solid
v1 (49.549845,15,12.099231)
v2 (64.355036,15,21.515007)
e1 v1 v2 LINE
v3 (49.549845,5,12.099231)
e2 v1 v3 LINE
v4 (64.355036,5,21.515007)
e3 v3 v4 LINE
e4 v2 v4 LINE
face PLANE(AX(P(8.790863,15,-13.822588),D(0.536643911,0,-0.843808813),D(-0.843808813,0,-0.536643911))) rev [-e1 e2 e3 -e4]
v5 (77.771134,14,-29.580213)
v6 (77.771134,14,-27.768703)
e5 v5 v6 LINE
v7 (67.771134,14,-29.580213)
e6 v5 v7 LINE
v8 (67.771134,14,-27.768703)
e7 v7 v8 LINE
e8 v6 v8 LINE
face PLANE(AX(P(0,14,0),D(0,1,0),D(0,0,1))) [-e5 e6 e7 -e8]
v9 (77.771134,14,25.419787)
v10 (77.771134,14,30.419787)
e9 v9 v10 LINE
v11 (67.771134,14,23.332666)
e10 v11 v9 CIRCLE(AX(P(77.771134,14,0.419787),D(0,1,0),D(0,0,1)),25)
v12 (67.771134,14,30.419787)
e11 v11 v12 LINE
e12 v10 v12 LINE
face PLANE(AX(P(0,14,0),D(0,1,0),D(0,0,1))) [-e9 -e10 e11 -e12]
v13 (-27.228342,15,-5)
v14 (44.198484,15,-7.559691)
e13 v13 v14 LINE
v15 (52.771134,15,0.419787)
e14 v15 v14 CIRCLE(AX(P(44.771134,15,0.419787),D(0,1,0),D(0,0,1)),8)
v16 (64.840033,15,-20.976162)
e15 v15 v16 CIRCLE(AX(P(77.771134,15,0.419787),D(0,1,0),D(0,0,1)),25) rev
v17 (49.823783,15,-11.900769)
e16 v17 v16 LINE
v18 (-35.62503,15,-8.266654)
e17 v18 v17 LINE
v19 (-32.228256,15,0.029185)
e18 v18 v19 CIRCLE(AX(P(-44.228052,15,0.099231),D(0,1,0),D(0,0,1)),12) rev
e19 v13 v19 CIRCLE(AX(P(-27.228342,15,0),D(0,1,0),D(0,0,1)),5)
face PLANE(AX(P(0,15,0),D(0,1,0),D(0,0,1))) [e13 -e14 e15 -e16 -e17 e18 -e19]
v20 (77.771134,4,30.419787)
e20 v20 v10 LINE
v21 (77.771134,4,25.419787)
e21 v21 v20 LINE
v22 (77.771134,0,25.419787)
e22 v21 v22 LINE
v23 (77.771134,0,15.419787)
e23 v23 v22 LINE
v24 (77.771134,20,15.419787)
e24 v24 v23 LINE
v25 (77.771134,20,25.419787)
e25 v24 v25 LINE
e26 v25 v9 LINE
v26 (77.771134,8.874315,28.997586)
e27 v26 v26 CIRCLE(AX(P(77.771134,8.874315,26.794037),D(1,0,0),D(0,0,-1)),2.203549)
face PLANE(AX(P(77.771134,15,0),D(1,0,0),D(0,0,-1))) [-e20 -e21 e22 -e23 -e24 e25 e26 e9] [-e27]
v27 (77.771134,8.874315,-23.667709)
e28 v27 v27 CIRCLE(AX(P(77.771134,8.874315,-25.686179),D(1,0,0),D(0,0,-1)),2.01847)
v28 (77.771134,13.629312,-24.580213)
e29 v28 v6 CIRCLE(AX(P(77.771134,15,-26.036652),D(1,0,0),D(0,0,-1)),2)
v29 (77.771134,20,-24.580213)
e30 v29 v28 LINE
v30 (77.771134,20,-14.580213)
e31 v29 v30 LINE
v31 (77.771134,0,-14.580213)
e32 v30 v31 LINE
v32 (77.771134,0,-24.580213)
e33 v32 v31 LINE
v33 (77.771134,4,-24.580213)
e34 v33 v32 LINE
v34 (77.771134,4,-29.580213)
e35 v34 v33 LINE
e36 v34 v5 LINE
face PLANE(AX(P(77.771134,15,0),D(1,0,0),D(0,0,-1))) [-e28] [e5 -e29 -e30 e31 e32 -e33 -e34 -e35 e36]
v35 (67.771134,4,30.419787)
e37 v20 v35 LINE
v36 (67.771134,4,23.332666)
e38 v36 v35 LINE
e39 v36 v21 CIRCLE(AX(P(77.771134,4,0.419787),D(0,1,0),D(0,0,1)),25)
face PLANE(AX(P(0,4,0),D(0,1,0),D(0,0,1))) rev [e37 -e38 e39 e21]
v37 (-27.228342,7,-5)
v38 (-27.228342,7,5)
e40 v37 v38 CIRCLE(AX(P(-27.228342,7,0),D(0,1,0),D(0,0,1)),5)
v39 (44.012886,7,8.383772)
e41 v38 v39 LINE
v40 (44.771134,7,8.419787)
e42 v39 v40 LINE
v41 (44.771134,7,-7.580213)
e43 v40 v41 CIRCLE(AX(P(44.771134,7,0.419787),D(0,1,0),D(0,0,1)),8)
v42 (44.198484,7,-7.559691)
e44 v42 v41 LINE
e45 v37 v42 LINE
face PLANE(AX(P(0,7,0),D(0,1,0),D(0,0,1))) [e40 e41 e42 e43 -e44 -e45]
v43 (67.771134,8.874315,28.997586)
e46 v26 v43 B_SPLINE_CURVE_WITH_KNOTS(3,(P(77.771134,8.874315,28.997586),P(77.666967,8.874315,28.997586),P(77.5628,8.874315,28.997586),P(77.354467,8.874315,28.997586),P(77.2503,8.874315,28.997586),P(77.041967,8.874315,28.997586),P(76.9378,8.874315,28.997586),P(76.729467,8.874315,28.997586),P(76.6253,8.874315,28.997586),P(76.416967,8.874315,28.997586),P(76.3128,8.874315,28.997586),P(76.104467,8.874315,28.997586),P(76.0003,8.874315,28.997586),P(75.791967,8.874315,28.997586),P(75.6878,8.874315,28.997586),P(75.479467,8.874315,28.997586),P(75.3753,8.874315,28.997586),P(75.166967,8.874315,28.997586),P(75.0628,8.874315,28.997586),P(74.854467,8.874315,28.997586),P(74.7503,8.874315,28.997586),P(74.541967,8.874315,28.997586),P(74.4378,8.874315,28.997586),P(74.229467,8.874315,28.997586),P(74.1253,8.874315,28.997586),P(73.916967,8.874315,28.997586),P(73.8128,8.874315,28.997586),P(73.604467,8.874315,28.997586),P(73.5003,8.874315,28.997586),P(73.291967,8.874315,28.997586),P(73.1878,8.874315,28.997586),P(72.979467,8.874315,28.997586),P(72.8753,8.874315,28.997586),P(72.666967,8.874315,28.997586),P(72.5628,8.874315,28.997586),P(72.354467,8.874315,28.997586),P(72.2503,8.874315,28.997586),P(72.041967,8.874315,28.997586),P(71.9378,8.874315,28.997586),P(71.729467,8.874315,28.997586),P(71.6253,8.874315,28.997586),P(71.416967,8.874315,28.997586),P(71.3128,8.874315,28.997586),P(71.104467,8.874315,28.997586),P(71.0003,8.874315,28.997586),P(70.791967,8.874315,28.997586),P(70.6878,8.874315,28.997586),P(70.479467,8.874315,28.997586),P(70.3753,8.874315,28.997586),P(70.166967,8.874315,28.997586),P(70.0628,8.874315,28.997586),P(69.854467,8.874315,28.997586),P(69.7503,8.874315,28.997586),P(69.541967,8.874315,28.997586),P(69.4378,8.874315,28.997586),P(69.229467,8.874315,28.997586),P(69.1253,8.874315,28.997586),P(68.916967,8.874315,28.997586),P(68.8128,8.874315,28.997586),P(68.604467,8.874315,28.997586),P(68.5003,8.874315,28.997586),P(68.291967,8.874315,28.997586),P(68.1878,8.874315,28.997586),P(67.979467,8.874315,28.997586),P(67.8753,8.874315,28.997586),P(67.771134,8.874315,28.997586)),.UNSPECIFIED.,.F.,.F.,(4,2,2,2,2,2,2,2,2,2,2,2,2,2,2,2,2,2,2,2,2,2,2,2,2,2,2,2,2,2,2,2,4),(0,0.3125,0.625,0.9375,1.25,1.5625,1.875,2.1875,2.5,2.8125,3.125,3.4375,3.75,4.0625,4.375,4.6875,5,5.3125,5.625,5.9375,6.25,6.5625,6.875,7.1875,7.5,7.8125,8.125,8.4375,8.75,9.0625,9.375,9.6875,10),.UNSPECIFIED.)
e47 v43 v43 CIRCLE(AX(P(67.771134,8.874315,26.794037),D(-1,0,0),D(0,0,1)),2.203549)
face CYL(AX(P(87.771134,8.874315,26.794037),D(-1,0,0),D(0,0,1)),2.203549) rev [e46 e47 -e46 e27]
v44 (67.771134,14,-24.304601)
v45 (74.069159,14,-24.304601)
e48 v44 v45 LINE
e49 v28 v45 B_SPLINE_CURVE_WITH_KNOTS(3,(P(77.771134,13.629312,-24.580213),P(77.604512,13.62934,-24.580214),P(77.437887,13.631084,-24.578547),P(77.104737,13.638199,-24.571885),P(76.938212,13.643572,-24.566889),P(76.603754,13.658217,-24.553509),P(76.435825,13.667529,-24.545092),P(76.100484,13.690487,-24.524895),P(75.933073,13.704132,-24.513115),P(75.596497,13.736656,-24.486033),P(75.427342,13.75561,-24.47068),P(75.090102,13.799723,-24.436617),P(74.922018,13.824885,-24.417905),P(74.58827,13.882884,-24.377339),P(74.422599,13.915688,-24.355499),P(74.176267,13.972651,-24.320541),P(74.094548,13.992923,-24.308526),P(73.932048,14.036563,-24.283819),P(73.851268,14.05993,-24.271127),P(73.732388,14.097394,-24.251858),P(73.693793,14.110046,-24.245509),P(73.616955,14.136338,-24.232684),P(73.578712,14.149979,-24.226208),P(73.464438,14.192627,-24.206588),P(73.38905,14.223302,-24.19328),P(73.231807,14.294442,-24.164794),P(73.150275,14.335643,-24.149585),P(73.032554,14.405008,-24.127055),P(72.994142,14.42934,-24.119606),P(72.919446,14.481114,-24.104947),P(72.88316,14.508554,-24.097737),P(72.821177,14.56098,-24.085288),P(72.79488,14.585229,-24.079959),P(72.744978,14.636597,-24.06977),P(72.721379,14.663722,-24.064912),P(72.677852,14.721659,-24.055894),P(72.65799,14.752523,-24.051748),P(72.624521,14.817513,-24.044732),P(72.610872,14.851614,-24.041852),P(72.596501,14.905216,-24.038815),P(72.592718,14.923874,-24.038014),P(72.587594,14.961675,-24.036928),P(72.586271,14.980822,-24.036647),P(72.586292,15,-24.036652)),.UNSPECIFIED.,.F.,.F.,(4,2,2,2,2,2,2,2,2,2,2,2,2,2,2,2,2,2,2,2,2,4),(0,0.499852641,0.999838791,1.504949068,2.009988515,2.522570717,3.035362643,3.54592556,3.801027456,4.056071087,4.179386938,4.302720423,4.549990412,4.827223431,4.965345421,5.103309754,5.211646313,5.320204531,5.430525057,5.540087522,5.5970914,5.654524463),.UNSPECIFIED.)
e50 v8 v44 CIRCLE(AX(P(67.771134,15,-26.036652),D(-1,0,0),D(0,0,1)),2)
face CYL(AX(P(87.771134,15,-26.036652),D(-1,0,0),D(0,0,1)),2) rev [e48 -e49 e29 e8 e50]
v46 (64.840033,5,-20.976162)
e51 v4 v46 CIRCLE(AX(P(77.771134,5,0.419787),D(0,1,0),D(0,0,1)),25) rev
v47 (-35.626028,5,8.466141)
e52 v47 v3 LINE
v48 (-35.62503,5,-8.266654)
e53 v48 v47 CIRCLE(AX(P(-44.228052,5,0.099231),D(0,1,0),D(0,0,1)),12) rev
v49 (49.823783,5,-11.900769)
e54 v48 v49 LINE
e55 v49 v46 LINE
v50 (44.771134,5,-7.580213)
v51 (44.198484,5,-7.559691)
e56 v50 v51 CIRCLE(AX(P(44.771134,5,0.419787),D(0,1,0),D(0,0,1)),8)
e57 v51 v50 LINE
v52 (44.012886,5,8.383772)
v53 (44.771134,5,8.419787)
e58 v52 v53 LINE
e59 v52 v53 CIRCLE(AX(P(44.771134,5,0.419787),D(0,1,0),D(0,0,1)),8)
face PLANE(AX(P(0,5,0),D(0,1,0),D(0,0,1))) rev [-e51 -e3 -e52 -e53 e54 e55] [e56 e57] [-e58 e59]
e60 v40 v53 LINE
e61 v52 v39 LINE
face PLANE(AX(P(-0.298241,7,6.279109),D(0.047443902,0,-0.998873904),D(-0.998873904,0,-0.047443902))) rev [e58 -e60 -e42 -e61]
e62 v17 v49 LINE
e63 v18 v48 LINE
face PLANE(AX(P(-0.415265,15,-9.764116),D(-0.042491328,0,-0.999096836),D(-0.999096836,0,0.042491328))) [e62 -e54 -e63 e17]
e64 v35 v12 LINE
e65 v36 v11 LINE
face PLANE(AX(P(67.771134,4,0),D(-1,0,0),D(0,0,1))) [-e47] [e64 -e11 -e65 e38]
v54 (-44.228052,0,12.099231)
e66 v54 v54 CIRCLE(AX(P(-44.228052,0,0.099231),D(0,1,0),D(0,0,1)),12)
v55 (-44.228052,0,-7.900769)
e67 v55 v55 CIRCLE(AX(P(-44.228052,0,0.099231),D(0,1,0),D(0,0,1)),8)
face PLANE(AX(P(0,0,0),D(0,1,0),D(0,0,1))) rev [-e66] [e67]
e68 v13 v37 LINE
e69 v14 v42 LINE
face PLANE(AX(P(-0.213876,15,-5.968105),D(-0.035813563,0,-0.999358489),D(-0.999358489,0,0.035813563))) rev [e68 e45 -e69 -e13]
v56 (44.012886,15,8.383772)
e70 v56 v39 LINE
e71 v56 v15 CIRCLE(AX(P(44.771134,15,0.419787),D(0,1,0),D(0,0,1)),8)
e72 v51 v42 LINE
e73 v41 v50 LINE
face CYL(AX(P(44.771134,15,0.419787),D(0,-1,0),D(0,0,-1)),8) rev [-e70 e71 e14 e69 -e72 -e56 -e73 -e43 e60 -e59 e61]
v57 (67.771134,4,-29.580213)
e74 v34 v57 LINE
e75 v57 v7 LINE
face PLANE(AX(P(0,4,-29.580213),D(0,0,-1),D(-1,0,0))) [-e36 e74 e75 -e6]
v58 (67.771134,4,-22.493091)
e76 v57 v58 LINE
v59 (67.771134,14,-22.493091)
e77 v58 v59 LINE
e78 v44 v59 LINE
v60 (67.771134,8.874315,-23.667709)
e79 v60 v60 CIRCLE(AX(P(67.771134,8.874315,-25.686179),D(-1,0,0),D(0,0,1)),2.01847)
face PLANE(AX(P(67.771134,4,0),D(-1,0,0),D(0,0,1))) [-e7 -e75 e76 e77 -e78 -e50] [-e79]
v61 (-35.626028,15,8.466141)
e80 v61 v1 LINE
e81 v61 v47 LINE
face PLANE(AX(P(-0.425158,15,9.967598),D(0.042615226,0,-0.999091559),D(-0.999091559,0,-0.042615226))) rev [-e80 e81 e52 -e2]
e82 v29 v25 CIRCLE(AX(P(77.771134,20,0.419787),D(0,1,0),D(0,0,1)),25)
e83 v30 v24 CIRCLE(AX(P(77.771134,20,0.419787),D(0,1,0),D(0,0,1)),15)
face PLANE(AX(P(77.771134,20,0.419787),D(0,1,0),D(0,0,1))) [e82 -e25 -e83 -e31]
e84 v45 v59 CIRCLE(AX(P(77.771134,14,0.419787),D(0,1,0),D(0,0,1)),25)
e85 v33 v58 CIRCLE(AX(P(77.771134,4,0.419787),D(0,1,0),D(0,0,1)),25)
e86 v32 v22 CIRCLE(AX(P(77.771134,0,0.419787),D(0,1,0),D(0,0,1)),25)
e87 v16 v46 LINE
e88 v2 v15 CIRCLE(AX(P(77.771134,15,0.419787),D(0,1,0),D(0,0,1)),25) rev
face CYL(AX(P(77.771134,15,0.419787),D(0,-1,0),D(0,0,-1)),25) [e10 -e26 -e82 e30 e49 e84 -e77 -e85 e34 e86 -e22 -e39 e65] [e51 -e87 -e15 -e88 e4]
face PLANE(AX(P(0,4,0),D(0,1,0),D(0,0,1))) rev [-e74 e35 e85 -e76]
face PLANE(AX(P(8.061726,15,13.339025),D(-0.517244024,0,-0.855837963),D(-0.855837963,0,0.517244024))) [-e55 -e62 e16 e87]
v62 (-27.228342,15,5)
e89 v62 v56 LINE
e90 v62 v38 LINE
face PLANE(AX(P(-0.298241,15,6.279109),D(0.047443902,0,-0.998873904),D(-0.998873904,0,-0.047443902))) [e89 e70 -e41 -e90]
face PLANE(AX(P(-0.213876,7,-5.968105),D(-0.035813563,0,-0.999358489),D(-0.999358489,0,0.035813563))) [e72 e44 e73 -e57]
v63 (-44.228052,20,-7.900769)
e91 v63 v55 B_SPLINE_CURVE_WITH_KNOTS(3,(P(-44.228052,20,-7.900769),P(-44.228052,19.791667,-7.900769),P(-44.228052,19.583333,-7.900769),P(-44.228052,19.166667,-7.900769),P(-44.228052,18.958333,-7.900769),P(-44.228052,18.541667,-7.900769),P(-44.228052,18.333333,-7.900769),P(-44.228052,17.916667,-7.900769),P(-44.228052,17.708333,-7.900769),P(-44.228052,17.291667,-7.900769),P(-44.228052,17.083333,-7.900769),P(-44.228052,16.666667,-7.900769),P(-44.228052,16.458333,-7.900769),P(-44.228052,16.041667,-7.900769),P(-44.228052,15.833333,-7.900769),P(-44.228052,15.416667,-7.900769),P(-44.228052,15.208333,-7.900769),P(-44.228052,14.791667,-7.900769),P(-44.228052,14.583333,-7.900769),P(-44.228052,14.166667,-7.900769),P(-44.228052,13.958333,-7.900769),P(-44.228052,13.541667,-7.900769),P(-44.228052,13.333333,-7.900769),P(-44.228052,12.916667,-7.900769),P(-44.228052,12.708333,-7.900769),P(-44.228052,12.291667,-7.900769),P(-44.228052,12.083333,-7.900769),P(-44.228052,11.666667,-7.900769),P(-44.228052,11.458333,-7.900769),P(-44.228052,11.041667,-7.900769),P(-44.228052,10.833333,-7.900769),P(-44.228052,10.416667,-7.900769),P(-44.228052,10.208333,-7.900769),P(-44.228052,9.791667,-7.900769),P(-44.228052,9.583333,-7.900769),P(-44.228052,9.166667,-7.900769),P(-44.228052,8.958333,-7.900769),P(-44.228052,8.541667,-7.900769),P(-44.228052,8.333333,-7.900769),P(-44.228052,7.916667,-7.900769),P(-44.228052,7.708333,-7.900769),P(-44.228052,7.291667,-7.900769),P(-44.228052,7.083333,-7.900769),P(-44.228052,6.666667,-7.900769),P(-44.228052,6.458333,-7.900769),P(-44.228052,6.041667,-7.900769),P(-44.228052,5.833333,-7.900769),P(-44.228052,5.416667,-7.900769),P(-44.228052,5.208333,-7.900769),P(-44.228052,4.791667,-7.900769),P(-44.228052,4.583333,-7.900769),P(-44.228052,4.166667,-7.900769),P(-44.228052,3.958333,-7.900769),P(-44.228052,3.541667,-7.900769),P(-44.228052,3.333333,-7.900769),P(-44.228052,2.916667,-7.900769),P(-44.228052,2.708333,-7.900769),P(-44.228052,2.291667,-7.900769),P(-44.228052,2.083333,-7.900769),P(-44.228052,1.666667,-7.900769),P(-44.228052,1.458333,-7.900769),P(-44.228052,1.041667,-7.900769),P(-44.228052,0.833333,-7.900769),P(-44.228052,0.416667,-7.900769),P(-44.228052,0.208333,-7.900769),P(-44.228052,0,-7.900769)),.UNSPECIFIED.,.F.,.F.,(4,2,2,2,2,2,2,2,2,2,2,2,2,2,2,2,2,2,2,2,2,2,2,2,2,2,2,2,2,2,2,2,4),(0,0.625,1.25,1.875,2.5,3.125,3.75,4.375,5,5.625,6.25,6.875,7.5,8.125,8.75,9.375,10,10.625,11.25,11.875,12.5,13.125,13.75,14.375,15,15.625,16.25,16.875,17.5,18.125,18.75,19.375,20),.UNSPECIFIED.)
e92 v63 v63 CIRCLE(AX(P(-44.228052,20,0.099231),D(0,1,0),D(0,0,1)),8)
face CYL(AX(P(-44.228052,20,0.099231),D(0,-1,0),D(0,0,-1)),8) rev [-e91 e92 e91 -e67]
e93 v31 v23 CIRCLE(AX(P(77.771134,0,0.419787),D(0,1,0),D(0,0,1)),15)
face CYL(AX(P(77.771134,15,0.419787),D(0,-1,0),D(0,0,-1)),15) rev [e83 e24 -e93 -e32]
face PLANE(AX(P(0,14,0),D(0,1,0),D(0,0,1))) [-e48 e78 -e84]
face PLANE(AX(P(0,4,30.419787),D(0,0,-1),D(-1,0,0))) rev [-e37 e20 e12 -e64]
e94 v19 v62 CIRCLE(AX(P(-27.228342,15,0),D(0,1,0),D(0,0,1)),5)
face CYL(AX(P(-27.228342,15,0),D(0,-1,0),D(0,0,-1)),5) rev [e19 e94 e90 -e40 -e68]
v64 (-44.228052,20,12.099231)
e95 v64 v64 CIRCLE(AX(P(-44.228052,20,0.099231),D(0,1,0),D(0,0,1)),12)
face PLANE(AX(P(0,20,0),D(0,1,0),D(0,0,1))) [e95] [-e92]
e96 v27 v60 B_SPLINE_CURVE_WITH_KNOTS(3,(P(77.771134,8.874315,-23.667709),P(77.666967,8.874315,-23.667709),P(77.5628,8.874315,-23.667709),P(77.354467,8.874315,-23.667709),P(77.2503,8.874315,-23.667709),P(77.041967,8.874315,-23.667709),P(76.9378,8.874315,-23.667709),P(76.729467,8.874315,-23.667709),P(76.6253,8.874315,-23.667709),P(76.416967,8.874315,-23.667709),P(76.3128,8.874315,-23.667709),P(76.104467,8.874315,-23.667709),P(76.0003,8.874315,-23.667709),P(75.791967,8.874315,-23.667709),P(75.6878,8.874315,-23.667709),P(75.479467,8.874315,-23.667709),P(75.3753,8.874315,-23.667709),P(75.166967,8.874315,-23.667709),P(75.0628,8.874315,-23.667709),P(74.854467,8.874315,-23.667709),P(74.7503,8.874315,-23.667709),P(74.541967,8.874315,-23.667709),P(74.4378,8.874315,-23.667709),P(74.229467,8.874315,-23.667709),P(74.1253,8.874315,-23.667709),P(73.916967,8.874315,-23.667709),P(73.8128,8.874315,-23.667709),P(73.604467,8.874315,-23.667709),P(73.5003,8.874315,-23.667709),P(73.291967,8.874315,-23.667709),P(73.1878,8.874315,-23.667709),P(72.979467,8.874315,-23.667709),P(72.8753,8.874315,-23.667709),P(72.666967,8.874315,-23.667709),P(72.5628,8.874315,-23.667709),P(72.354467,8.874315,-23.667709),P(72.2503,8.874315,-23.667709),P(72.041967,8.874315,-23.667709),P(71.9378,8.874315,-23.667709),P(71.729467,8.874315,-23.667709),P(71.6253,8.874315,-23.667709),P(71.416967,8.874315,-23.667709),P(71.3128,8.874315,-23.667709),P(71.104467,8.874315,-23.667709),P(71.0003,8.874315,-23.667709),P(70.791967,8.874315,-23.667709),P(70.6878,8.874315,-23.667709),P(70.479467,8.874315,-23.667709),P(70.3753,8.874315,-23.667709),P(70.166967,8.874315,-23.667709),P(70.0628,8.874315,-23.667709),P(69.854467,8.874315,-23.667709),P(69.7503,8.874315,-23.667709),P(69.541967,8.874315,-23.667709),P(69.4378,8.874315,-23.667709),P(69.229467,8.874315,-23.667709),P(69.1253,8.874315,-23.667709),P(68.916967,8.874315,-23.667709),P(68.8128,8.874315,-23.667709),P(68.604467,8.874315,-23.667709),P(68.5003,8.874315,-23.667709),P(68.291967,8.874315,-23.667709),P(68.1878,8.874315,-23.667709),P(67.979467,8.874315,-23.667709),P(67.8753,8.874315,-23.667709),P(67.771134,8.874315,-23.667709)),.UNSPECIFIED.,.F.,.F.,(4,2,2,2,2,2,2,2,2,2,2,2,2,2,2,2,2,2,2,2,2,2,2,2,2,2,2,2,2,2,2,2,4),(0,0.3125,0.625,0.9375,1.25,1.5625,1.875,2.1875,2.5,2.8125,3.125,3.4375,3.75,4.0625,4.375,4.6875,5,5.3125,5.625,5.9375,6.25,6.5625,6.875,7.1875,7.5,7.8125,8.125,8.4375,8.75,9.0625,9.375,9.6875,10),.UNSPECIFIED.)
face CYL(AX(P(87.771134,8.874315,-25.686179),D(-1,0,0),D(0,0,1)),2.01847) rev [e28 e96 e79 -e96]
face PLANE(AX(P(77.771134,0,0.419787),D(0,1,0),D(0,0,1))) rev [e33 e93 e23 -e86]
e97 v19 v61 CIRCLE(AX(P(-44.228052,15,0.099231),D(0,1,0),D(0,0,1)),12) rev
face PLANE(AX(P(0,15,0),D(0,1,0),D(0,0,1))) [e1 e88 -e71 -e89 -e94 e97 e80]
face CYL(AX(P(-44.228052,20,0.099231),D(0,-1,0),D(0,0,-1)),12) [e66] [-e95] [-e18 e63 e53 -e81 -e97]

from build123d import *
from build123d.topology import SkipClean

# Parameters (mm, degrees)
EXTRUDE_START       = 5
EXTRUDE_2_DEPTH     = 10
EXTRUDE_4_DEPTH     = 2
EXTRUDE_START_2     = -11
EXTRUDE_5_DEPTH     = 10
EXTRUDE_6_DEPTH     = 20
SKETCH_1_10_R       = 12
EXTRUDE_7_DEPTH     = 10
SKETCH_1_11_R       = 12
EXTRUDE_8_DEPTH     = 20
SKETCH_1_12_R       = 8
CUT_EXTRUDE_1_DEPTH = 20
SKETCH_5_R          = 2
CUT_EXTRUDE_2_DEPTH = 20
EXTRUDE_9_DEPTH     = 20
SKETCH_6_R          = 2.01846984
SKETCH_6_R_2        = 2.203549483
CUT_EXTRUDE_3_DEPTH = 20


with BuildPart() as part:
    # 스케치1 → 보스-돌출2 (new body)
    with BuildSketch(Plane(origin=(0, 0, 0), x_dir=(1, 0, 0), z_dir=(0, 1, 0)).offset(EXTRUDE_START)):
        with BuildLine():
            Line((49.549845173, -12.099230676), (64.355035733, -21.515007377))
            ThreePointArc((64.355035733, -21.515007377), (70.784736297, -24.42375035), (77.771133503, -25.41978705))
            Line((77.771133503, -25.41978705), (77.771133503, -15.41978705))
            ThreePointArc((77.771133503, -15.41978705), (62.771133503, -0.41978705), (77.771133503, 14.58021295))
            Line((77.771133503, 14.58021295), (77.771133503, 24.58021295))
            ThreePointArc((77.771133503, 24.58021295), (71.05915641, 23.662350801), (64.840032894, 20.97616203))
            Line((64.840032894, 20.97616203), (49.823782841, 11.900769324))
            Line((49.823782841, 11.900769324), (-44.228051971, 7.900769324))
            ThreePointArc((-44.228051971, 7.900769324), (-36.228051971, -0.099230676), (-44.228051971, -8.099230676))
            Line((-44.228051971, -8.099230676), (49.549845173, -12.099230676))
        make_face()
        with BuildLine():
            ThreePointArc((44.198484097, 7.559691169), (52.770591505, -0.512908915), (44.012885893, -8.383772269))
            Line((44.012885893, -8.383772269), (-27.228341583, -5))
            ThreePointArc((-27.228341583, -5), (-32.228341583, 0), (-27.228341583, 5))
            Line((-27.228341583, 5), (44.198484097, 7.559691169))
        make_face(mode=Mode.SUBTRACT)
    extrude(amount=EXTRUDE_2_DEPTH)

    # 스케치1<8> → 보스-돌출4 (add)
    with BuildSketch(Plane(origin=(0, 0, 0), x_dir=(1, 0, 0), z_dir=(0, 1, 0)).offset(EXTRUDE_START)):
        with BuildLine():
            Line((44.198484097, 7.559691169), (-27.228341583, 5))
            ThreePointArc((-27.228341583, 5), (-30.774179158, 3.525200121), (-32.228256402, -0.029185644))
            ThreePointArc((-32.228256402, -0.029185644), (-30.753541703, -3.545837575), (-27.228341583, -5))
            Line((-27.228341583, -5), (44.012885893, -8.383772269))
            Line((44.012885893, -8.383772269), (44.771133503, -8.41978705))
            ThreePointArc((44.771133503, -8.41978705), (50.42798774, -6.076641312), (52.771133503, -0.419787086))
            ThreePointArc((52.771133503, -0.419787086), (50.427987765, 5.237067187), (44.771133503, 7.58021295))
            Line((44.771133503, 7.58021295), (44.198484097, 7.559691169))
        make_face()
    extrude(amount=EXTRUDE_4_DEPTH)

    # 스케치2 → 보스-돌출5 (add)
    with BuildSketch(Plane(origin=(0, 15, 0), x_dir=(1, 0, 0), z_dir=(0, 1, 0)).offset(EXTRUDE_START_2)):
        with BuildLine():
            Line((67.771133503, -30.41978705), (77.771133503, -30.41978705))
            Line((77.771133503, -30.41978705), (77.771133503, -25.41978705))
            ThreePointArc((77.771133503, -25.41978705), (72.663392411, -24.892444873), (67.771133503, -23.332665525))
            Line((67.771133503, -23.332665525), (67.771133503, -30.41978705))
        make_face()
        with BuildLine():
            Line((67.771133503, 29.58021295), (67.771133503, 22.493091425))
            ThreePointArc((67.771133503, 22.493091425), (72.663392411, 24.052870773), (77.771133503, 24.58021295))
            Line((77.771133503, 24.58021295), (77.771133503, 29.58021295))
            Line((77.771133503, 29.58021295), (67.771133503, 29.58021295))
        make_face()
    extrude(amount=EXTRUDE_5_DEPTH)

    # 스케치1<9> → 보스-돌출6 (add)
    with BuildSketch(Plane(origin=(0, 0, 0), x_dir=(1, 0, 0), z_dir=(0, 1, 0))):
        with BuildLine():
            Line((-44.228051971, 7.900769324), (-35.625030381, 8.266653588))
            ThreePointArc((-35.625030381, 8.266653588), (-56.22805195, -0.098514915), (-35.626028438, -8.466141165))
            Line((-35.626028438, -8.466141165), (-44.228051971, -8.099230676))
            ThreePointArc((-44.228051971, -8.099230676), (-52.228051971, -0.099230676), (-44.228051971, 7.900769324))
        make_face()
    extrude(amount=EXTRUDE_6_DEPTH)

    # 스케치1<10> → 보스-돌출7 (add)
    with BuildSketch(Plane(origin=(0, 0, 0), x_dir=(1, 0, 0), z_dir=(0, 1, 0))):
        with Locations(Location((-44.228051971, -0.099230676, 0), (0, 0, 44.199354179))):
            Circle(SKETCH_1_10_R)
    extrude(amount=EXTRUDE_7_DEPTH)

    # 스케치1<11> → 보스-돌출8 (add)
    with SkipClean():  # the faces are left unmerged after this step: merging them gives an invalid solid
        with BuildSketch(Plane(origin=(0, 0, 0), x_dir=(1, 0, 0), z_dir=(0, 1, 0))):
            with Locations(Location((-44.228051971, -0.099230676, 0), (0, 0, 270))):
                Circle(SKETCH_1_11_R)
        extrude(amount=EXTRUDE_8_DEPTH)
    add(part.part.scale(1), mode=Mode.REPLACE)  # the faces are merged on a copy

    # 스케치1<12> → 컷-돌출1 (cut)
    with BuildSketch(Plane(origin=(0, 0, 0), x_dir=(1, 0, 0), z_dir=(0, 1, 0))):
        with Locations(Location((-44.228051971, -0.099230676, 0), (0, 0, 90))):
            Circle(SKETCH_1_12_R)
    extrude(amount=CUT_EXTRUDE_1_DEPTH, mode=Mode.SUBTRACT)

    # 스케치5 → 컷-돌출2 (cut)
    with BuildSketch(Plane.ZY.offset(-67.771133503)):
        with Locations((-26.036652187, 15)):
            Circle(SKETCH_5_R)
    extrude(amount=-CUT_EXTRUDE_2_DEPTH, mode=Mode.SUBTRACT)

    # 스케치1<13> → 보스-돌출9 (add)
    with SkipClean():  # the faces are left unmerged after this step: merging them gives an invalid solid
        with BuildSketch(Plane(origin=(0, 0, 0), x_dir=(1, 0, 0), z_dir=(0, 1, 0))):
            with BuildLine():
                Line((77.771133503, 24.58021295), (77.771133503, 14.58021295))
                ThreePointArc((77.771133503, 14.58021295), (62.771133503, -0.41978705), (77.771133503, -15.41978705))
                Line((77.771133503, -15.41978705), (77.771133503, -25.41978705))
                ThreePointArc((77.771133503, -25.41978705), (52.771133503, -0.41978705), (77.771133503, 24.58021295))
            make_face()
        extrude(amount=EXTRUDE_9_DEPTH)
    add(part.part.scale(1), mode=Mode.REPLACE)  # the faces are merged on a copy

    # 스케치6 → 컷-돌출3 (cut)
    with BuildSketch(Plane.ZY.offset(-67.771133503)):
        with Locations((-25.686179168, 8.874314897)):
            Circle(SKETCH_6_R)
        with Locations((26.79403668, 8.874314897)):
            Circle(SKETCH_6_R_2)
    extrude(amount=-CUT_EXTRUDE_3_DEPTH, mode=Mode.SUBTRACT)


solid = part.part
